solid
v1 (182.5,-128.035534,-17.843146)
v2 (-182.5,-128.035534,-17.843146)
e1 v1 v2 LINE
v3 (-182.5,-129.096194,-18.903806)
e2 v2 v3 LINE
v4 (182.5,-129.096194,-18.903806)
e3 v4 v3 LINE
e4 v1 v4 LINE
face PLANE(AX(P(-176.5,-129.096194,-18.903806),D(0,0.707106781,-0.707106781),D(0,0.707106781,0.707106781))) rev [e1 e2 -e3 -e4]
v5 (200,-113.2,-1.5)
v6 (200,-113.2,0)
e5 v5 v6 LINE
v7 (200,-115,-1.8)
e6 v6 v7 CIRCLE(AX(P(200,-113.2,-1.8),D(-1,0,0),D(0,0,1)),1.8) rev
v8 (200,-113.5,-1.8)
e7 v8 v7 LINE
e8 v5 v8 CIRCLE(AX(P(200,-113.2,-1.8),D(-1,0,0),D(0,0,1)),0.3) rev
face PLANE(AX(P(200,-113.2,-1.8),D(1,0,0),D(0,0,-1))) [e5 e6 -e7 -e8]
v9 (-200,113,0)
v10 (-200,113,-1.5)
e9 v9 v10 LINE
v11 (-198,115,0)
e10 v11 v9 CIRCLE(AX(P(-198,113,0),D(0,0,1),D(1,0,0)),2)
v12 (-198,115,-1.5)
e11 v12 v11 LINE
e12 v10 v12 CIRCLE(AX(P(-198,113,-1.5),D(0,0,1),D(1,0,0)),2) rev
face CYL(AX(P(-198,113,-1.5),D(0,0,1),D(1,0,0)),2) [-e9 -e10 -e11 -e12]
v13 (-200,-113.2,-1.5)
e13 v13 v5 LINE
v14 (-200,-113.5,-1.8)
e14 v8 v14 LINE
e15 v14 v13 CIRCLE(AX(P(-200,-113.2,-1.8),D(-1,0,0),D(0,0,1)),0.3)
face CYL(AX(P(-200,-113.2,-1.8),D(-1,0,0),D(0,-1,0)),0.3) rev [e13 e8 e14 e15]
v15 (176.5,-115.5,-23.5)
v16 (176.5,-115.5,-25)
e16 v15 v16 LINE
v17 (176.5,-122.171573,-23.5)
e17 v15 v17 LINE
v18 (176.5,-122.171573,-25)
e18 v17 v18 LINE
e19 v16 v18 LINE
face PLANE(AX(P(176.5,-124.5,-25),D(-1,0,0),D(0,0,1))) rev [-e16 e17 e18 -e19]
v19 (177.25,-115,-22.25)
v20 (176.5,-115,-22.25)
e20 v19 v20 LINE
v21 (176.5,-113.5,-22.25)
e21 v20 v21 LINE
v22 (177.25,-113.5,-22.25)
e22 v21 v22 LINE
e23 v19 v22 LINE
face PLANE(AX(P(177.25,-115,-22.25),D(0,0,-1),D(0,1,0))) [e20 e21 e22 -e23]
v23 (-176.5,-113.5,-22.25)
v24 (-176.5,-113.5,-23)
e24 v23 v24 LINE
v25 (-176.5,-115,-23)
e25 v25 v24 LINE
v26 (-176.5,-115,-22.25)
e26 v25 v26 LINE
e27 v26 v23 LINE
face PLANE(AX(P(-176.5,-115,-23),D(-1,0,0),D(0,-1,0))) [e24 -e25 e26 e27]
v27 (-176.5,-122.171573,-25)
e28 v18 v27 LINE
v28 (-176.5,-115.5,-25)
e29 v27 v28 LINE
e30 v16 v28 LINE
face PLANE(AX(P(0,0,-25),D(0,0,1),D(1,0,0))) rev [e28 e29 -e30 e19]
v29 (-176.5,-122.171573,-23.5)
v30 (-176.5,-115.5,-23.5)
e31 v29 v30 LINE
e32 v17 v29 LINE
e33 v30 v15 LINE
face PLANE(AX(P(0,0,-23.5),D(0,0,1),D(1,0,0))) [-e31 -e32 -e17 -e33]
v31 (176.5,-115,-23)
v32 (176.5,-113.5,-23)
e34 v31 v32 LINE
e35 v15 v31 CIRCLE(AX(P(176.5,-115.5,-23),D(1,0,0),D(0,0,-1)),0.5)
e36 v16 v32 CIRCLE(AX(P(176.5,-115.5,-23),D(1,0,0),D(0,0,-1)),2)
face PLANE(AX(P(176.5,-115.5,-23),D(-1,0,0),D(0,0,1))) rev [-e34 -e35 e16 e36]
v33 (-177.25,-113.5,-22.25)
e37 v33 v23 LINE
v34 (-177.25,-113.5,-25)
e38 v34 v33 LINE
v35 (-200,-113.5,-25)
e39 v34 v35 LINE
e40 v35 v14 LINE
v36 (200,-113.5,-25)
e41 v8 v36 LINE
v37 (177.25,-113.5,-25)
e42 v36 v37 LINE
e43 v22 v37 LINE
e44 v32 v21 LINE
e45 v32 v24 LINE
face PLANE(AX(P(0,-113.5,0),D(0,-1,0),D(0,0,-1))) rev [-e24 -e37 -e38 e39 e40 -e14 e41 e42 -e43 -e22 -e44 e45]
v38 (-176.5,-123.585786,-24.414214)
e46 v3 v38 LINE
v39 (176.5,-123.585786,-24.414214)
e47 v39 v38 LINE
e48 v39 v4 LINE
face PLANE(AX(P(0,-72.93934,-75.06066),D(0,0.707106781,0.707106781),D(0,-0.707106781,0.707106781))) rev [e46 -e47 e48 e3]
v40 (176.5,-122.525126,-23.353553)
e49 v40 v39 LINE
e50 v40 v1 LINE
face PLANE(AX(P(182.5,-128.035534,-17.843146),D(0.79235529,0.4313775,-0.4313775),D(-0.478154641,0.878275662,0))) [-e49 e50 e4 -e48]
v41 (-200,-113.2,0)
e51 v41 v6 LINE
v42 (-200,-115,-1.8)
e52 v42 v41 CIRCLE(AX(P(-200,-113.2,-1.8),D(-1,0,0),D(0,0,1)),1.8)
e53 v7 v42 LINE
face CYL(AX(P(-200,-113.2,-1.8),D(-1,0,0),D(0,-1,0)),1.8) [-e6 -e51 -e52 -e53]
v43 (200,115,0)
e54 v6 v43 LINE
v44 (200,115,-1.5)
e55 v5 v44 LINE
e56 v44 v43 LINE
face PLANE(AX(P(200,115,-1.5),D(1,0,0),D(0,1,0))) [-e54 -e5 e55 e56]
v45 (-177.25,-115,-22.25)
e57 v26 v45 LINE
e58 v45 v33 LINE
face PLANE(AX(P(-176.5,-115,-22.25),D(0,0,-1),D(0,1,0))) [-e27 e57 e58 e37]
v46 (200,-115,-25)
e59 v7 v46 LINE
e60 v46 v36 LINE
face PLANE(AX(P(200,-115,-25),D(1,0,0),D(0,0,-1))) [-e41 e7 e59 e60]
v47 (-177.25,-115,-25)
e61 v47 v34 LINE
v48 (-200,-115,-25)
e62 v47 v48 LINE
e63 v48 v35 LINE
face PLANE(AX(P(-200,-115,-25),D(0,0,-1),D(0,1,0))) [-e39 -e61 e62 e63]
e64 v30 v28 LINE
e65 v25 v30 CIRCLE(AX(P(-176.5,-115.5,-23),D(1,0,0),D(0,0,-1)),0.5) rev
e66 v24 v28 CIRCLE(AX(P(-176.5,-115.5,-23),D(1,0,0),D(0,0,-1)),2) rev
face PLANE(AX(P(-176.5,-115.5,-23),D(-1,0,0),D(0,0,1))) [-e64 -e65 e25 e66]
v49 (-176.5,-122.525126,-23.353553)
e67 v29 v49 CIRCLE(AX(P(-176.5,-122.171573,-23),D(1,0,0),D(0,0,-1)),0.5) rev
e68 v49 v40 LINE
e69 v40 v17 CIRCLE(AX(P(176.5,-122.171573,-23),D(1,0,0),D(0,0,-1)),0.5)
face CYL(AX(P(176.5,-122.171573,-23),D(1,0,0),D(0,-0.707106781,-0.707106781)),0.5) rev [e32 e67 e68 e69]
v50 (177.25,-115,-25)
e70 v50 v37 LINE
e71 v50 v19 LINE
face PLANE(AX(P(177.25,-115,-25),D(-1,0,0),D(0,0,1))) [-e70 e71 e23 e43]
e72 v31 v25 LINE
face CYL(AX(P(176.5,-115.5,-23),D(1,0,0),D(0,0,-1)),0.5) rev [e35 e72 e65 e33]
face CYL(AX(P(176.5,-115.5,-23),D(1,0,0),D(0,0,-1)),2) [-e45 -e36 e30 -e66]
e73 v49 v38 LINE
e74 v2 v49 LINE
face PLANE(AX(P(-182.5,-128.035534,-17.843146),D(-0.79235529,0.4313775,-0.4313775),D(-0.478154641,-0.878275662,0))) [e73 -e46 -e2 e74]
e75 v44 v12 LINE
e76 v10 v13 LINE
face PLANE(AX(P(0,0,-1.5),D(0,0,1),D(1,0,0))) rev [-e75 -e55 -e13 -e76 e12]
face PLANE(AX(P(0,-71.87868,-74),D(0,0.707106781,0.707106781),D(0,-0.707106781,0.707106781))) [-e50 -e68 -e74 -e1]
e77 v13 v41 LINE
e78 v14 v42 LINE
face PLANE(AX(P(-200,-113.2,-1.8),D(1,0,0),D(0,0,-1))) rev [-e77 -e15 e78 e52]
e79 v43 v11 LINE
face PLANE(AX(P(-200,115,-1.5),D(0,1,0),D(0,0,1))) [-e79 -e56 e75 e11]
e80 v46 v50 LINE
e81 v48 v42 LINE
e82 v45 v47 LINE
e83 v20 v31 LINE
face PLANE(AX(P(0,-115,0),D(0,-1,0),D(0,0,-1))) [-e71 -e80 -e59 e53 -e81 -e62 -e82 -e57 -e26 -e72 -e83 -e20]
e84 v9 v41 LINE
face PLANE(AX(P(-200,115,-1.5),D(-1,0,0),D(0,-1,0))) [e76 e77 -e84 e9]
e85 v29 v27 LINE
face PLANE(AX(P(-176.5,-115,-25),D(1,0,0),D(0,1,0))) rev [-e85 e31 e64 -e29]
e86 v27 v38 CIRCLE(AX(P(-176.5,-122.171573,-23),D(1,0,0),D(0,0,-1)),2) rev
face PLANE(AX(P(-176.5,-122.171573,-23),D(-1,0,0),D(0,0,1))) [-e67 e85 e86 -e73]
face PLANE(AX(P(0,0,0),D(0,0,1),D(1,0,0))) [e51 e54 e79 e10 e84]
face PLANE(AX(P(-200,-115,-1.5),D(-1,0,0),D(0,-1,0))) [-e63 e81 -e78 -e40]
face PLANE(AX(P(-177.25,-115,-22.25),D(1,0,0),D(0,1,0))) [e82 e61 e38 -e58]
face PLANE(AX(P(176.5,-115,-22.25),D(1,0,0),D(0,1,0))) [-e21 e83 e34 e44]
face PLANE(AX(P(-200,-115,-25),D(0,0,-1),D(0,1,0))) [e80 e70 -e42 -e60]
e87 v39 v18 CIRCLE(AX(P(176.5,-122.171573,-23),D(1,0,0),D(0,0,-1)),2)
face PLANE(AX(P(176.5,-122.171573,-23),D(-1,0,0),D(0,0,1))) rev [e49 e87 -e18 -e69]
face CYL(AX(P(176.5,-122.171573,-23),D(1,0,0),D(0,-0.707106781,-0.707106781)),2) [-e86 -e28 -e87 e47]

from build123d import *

# Parameters (mm, degrees)
SKETCH_1_W                        = 400
SKETCH_1_H                        = 230
SM_BASE_FLANGE_1_DEPTH            = 1.5
SM_EDGE_FLANGE_1_STRIP_W          = 6.6
SM_EDGE_FLANGE_1_STRIP_H          = 1.5
SM_EDGE_FLANGE_1_STRIP_CUT_DEPTH  = 400
SM_EDGE_FLANGE_1_DEPTH            = 400
SM_EDGE_FLANGE_2_STRIP_W          = 7
SM_EDGE_FLANGE_2_STRIP_H          = 1.5
SM_EDGE_FLANGE_2_STRIP_CUT_DEPTH  = 353
SM_EDGE_FLANGE_2_RELIEF_W         = 7.75
SM_EDGE_FLANGE_2_RELIEF_H         = 0.75
SM_EDGE_FLANGE_2_RELIEF_CUT_DEPTH = 1.5
SM_EDGE_FLANGE_2_DEPTH            = 353
FILLET_1_R                        = 2
SM_START                          = -176.5
SM_EDGE_FLANGE_3_DEPTH            = 353
SM_EDGE_FLANGE_3_2_DEPTH          = 353
SM_BASE_FLANGE_1_2_DEPTH          = 1.5


# Read off the part's stored shape, not the designer's step: 边线-法兰3
# Sheet-metal steps are written as plain solids
with BuildPart() as part:
    # Sketch 1 → Sm Base Flange 1 (new body)
    with BuildSketch(Plane.XY):
        Rectangle(SKETCH_1_W, SKETCH_1_H)
    extrude(amount=-SM_BASE_FLANGE_1_DEPTH)

    # 边线-法兰1 strip (across the edge) → 边线-法兰1 strip cut (cut)
    with BuildSketch(Plane(origin=(200, -115, -1.5), x_dir=(0, 1, 0), z_dir=(-1, 0, 0))):
        with Locations((-1.5, -0.75)):
            Rectangle(SM_EDGE_FLANGE_1_STRIP_W, SM_EDGE_FLANGE_1_STRIP_H)
    extrude(amount=SM_EDGE_FLANGE_1_STRIP_CUT_DEPTH, mode=Mode.SUBTRACT)

    # 边线-法兰1 section (across the edge) → 边线-法兰1 (add)
    with BuildSketch(Plane(origin=(200, -115, -1.5), x_dir=(0, 1, 0), z_dir=(-1, 0, 0))):
        with BuildLine():
            Line((0, 0.3), (0, 23.5))
            Line((0, 23.5), (1.5, 23.5))
            Line((1.5, 23.5), (1.5, 0.3))
            ThreePointArc((1.5, 0.3), (1.587867966, 0.087867966), (1.8, 0))
            Line((1.8, 0), (1.8, -1.5))
            ThreePointArc((1.8, -1.5), (0.527207794, -0.972792206), (0, 0.3))
        make_face()
    extrude(amount=SM_EDGE_FLANGE_1_DEPTH)

    # 边线-法兰2 strip (across the edge) → 边线-法兰2 strip cut (cut)
    with BuildSketch(Plane(origin=(-176.5, -115, -25), x_dir=(0, 0, 1), z_dir=(1, 0, 0))):
        with Locations((-1.5, -0.75)):
            Rectangle(SM_EDGE_FLANGE_2_STRIP_W, SM_EDGE_FLANGE_2_STRIP_H)
    extrude(amount=SM_EDGE_FLANGE_2_STRIP_CUT_DEPTH, mode=Mode.SUBTRACT)

    # 边线-法兰2 relief (on the sheet) → 边线-法兰2 relief cut (cut)
    with BuildSketch(Plane(origin=(-176.5, -115, -23), x_dir=(0, 0, 1), z_dir=(0, -1, 0))):
        with Locations((-3.125, 0.375)):
            Rectangle(SM_EDGE_FLANGE_2_RELIEF_W, SM_EDGE_FLANGE_2_RELIEF_H)
        with Locations((-3.125, -353.375)):
            Rectangle(SM_EDGE_FLANGE_2_RELIEF_W, SM_EDGE_FLANGE_2_RELIEF_H)
    extrude(amount=-SM_EDGE_FLANGE_2_RELIEF_CUT_DEPTH, mode=Mode.SUBTRACT)

    # 边线-法兰2 section (across the edge) → 边线-法兰2 (add)
    with BuildSketch(Plane(origin=(-176.5, -115, -25), x_dir=(0, 0, 1), z_dir=(1, 0, 0))):
        with BuildLine():
            Line((0, 0.5), (0, 9.5))
            Line((0, 9.5), (1.5, 9.5))
            Line((1.5, 9.5), (1.5, 0.5))
            ThreePointArc((1.5, 0.5), (1.646446609, 0.146446609), (2, 0))
            Line((2, 0), (2, -1.5))
            ThreePointArc((2, -1.5), (0.585786438, -0.914213562), (0, 0.5))
        make_face()
    extrude(amount=SM_EDGE_FLANGE_2_DEPTH)

    # 圆角1
    fillet_1_edges = [part.edges().sort_by_distance(p)[0] for p in [
        (-200, 115, -0.75),
    ]]
    fillet(fillet_1_edges, radius=FILLET_1_R)

    # 边线-法兰3 outline → 边线-法兰3 (cut)
    with BuildSketch(Plane.YZ.offset(SM_START)):
        with BuildLine():
            ThreePointArc((-122.171572875, -25), (-122.93693974, -24.847759065), (-123.585786438, -24.414213562))
            Line((-123.585786438, -24.414213562), (-124.5, -23.5))
            Line((-124.5, -23.5), (-124.5, -25))
            Line((-124.5, -25), (-122.171572875, -25))
        make_face()
    extrude(amount=SM_EDGE_FLANGE_3_DEPTH, mode=Mode.SUBTRACT)

    # Sm Edge Flange 3 2 outline → Sm Edge Flange 3 2 (add)
    with BuildSketch(Plane.YZ.offset(SM_START)):
        with BuildLine():
            Line((-129.096194078, -18.903805922), (-124.5, -23.5))
            Line((-124.5, -23.5), (-122.171572875, -23.5))
            ThreePointArc((-122.171572875, -23.5), (-122.362914591, -23.461939766), (-122.525126266, -23.353553391))
            Line((-122.525126266, -23.353553391), (-128.035533906, -17.843145751))
            Line((-128.035533906, -17.843145751), (-129.096194078, -18.903805922))
        make_face()
    extrude(amount=SM_EDGE_FLANGE_3_2_DEPTH)

    # 草图40 → Sm Base Flange 1 2 (add)
    with BuildSketch(Plane(origin=(0, -74, -74), x_dir=(1, 0, 0), z_dir=(0, -0.7071067811865435, -0.7071067811865516))):
        Polygon((176.5, 77.9177849), (182.5, 77.9177849), (176.5, 70.124891681), align=None)
        Polygon((-176.5, 77.9177849), (-182.5, 77.9177849), (-176.5, 70.124891681), align=None)
    extrude(amount=-SM_BASE_FLANGE_1_2_DEPTH)


solid = part.part
